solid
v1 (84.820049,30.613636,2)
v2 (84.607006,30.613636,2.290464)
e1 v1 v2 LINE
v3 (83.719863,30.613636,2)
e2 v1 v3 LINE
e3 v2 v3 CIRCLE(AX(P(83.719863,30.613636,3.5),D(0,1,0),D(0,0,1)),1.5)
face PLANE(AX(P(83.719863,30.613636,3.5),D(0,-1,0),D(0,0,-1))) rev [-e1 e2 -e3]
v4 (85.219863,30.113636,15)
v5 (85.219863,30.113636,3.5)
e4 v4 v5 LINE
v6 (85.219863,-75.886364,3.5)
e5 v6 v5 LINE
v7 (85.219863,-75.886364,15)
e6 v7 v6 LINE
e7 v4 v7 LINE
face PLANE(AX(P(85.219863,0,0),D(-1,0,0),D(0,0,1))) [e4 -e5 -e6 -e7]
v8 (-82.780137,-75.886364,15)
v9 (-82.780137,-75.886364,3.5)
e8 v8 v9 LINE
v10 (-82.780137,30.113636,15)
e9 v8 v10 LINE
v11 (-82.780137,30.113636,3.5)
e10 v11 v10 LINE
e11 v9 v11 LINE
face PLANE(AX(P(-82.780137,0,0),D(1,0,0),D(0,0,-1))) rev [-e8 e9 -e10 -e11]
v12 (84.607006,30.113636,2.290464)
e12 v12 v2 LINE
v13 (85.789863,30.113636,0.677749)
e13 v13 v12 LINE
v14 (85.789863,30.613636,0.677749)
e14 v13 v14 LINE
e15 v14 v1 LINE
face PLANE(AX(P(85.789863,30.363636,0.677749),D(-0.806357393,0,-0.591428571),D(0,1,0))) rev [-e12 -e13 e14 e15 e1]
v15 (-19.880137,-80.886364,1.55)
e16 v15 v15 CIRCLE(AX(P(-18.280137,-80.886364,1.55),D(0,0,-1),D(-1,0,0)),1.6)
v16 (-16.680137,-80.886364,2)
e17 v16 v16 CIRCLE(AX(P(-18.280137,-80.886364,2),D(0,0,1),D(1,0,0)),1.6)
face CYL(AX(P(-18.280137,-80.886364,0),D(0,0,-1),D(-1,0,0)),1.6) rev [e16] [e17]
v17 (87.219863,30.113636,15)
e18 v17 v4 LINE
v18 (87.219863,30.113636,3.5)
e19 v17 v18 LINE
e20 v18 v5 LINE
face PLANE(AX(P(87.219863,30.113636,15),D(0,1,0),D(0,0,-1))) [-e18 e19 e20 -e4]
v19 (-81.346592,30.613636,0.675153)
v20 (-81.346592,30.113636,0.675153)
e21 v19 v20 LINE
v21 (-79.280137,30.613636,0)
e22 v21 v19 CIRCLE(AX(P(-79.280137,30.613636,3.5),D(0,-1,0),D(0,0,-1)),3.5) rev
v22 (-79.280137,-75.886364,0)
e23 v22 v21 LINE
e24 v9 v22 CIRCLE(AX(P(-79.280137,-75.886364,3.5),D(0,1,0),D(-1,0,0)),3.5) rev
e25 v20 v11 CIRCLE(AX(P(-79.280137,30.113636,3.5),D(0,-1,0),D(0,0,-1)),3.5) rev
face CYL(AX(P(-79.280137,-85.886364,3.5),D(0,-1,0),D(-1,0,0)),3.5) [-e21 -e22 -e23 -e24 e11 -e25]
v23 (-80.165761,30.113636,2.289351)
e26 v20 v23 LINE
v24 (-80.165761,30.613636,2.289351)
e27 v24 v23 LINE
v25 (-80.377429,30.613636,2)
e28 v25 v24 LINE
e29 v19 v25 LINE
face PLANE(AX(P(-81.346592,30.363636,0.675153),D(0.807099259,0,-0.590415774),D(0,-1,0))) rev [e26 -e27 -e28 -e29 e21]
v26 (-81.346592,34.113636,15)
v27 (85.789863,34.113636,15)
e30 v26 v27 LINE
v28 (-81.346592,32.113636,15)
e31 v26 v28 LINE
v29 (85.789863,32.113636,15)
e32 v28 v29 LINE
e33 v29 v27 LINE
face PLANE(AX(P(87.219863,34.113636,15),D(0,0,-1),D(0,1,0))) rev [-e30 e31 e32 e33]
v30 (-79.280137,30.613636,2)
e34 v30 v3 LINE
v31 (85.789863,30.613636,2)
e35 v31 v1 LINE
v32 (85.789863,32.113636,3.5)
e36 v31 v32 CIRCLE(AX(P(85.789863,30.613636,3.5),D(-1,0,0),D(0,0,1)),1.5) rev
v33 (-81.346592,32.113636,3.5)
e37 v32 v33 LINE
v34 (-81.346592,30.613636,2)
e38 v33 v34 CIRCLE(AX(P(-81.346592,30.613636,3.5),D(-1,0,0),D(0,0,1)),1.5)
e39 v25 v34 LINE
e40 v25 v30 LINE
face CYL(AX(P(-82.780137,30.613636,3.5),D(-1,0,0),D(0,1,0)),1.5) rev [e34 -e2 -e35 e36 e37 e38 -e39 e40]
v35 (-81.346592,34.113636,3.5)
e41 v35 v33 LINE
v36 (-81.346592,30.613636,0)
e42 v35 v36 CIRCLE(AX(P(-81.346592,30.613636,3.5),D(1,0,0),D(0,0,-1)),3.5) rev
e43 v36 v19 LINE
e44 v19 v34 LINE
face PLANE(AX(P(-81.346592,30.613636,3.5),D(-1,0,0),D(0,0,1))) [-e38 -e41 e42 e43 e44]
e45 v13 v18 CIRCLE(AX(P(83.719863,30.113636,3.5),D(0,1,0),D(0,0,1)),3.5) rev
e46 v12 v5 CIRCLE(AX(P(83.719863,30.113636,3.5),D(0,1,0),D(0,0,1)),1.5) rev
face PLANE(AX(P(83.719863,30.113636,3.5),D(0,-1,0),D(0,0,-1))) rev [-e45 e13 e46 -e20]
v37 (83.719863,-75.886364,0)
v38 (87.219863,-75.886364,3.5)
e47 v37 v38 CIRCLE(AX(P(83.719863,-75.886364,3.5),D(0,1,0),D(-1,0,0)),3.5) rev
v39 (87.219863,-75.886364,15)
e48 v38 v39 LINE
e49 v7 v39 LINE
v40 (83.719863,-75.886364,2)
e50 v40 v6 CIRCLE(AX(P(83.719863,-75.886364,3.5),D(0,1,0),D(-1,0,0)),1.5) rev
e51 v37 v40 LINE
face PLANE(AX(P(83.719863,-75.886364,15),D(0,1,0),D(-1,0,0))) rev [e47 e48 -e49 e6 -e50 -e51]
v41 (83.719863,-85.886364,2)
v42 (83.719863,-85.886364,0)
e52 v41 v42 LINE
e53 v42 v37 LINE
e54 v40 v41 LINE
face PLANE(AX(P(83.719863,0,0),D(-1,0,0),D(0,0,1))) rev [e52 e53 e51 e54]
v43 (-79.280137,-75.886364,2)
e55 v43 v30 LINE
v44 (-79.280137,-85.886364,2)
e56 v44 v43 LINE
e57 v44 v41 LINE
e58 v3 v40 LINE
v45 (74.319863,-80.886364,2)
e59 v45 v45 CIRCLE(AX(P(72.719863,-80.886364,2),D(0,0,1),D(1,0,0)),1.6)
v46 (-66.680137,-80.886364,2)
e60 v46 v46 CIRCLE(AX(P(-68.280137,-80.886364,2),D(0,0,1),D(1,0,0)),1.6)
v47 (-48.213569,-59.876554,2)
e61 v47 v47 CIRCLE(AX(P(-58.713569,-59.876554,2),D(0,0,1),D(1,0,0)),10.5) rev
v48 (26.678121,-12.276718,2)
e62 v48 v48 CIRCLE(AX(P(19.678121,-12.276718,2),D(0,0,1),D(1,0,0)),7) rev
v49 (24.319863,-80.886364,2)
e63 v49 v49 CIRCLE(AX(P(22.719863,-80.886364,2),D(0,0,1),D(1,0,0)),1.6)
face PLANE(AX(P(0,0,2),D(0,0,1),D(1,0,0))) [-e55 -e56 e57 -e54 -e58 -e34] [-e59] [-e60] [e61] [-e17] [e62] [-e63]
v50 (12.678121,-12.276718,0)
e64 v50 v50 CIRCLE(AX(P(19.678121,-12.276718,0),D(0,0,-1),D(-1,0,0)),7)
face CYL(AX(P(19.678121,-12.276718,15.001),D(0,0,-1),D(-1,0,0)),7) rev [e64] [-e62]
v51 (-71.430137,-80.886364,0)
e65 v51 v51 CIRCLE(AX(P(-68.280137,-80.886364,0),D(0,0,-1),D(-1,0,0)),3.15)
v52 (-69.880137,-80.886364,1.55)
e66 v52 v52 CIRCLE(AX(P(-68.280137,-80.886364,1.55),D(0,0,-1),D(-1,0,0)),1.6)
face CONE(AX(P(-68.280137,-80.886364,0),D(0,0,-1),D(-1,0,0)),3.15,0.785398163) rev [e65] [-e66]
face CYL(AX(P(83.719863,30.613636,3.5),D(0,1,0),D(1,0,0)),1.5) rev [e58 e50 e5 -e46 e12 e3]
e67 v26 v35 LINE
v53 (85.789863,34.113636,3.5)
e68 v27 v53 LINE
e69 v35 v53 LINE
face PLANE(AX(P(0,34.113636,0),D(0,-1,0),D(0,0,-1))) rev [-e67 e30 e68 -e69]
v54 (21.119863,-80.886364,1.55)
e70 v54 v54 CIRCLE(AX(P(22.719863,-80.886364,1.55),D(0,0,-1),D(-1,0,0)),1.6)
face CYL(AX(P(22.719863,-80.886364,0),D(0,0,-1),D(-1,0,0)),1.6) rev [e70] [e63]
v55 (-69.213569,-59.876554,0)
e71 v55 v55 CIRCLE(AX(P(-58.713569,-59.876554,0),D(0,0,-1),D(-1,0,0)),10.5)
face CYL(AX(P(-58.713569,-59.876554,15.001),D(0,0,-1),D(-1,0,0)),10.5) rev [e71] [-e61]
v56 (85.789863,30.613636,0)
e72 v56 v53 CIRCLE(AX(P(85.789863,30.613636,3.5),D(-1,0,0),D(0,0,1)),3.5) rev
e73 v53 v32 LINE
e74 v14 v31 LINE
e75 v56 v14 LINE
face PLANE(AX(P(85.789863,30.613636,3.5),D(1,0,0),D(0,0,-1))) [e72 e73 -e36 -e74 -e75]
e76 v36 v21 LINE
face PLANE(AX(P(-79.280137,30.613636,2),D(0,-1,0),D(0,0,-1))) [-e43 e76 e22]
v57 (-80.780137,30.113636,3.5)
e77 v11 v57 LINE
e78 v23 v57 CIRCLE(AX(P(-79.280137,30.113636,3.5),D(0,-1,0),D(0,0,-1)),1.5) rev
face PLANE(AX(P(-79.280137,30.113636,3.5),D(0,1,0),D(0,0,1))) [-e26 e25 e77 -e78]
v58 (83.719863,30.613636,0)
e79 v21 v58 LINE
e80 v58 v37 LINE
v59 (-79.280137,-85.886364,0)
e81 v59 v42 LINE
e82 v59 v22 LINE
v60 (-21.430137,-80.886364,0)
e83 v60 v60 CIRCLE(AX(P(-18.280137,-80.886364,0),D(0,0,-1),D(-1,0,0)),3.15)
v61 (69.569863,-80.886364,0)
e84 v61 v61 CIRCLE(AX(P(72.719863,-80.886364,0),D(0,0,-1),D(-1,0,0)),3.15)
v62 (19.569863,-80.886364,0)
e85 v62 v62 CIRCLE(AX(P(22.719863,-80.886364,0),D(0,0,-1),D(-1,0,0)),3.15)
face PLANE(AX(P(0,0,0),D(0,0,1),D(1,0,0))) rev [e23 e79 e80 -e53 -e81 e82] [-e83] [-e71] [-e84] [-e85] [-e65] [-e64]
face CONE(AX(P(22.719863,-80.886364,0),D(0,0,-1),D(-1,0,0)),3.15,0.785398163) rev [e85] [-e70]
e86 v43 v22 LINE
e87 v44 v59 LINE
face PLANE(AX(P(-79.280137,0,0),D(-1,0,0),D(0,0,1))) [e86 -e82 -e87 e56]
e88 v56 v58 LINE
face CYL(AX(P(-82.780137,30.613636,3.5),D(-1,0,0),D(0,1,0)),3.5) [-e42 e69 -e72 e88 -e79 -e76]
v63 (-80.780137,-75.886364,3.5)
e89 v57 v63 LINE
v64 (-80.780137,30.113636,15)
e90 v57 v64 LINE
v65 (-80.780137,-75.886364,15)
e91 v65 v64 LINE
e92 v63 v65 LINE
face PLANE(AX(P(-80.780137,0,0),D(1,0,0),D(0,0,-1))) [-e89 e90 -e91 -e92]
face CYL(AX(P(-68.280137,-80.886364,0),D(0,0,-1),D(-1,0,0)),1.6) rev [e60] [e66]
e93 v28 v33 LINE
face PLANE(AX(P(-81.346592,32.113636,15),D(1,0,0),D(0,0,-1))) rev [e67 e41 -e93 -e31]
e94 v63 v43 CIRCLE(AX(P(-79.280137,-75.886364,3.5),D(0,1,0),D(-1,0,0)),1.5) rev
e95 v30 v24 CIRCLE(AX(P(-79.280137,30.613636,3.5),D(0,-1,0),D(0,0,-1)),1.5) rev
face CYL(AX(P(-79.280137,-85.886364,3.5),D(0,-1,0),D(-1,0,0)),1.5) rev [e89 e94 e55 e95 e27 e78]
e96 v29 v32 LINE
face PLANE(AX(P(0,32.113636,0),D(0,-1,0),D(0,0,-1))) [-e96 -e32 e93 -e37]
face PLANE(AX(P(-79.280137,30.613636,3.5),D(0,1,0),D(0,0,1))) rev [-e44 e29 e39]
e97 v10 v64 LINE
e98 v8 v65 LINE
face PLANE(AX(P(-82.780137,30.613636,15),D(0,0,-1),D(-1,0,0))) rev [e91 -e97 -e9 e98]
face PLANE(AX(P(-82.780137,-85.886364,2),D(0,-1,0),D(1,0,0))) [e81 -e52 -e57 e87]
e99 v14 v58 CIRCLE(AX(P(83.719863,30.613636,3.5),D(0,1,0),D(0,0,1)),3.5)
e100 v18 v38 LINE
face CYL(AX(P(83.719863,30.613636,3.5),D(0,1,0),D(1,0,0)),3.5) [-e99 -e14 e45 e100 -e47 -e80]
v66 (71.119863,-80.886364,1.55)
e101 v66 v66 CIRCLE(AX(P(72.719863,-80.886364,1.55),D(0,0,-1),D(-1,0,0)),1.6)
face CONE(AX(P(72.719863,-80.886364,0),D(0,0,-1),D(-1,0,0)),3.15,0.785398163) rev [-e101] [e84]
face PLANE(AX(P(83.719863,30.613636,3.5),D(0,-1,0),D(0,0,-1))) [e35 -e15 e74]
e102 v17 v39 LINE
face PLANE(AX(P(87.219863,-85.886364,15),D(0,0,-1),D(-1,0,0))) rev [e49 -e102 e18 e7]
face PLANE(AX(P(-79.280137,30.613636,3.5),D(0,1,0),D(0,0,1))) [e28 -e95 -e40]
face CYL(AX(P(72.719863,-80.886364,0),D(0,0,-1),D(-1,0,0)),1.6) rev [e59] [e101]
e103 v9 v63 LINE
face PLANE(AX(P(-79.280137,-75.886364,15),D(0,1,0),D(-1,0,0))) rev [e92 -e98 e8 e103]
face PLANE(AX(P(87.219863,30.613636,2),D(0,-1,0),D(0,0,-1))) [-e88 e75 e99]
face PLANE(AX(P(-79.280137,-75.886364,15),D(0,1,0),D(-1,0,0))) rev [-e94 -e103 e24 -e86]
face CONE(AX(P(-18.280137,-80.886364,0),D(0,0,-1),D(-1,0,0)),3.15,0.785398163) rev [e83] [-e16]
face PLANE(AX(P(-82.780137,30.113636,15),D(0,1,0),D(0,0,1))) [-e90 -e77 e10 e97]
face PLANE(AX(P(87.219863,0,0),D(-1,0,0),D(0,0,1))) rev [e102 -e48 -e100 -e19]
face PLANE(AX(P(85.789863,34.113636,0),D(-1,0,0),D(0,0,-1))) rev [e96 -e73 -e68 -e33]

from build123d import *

# Parameters (mm, degrees)
SKETCH1_W                                       = 170
SKETCH1_H                                       = 118
BOSS_EXTRUDE1_DEPTH                             = 2
EDGE_FLANGE4_STRIP_W                            = 11
EDGE_FLANGE4_STRIP_H                            = 2
EDGE_FLANGE4_STRIP_CUT_DEPTH                    = 170
EDGE_FLANGE4_DEPTH                              = 170
EDGE_FLANGE5_STRIP_W                            = 11
EDGE_FLANGE5_STRIP_H                            = 2
EDGE_FLANGE5_STRIP_CUT_DEPTH                    = 116.5
EDGE_FLANGE5_DEPTH                              = 116.5
EDGE_FLANGE6_STRIP_W                            = 11
EDGE_FLANGE6_STRIP_H                            = 2
EDGE_FLANGE6_STRIP_CUT_DEPTH                    = 116.5
EDGE_FLANGE6_DEPTH                              = 116.5
SKETCH26_W                                      = 18.240462441
SKETCH26_H                                      = 10
CUT_EXTRUDE2_DEPTH                              = 3.5
SKETCH27_W                                      = 23.960032842
SKETCH27_H                                      = 10
CUT_EXTRUDE3_DEPTH                              = 3.5
CSK_FOR_M3_FLAT_HEAD_MACHINE_SCREW2_D           = 3.2
CSK_FOR_M3_FLAT_HEAD_MACHINE_SCREW2_CSINK_D     = 6.3
CSK_FOR_M3_FLAT_HEAD_MACHINE_SCREW2_CSINK_ANGLE = 90
CUT_EXTRUDE4_REACH                              = 125.324
SKETCH32_R                                      = 7
CUT_EXTRUDE5_REACH                              = 125.324
SKETCH33_R                                      = 10.5
CUT_EXTRUDE6_START                              = -4
CUT_EXTRUDE6_OUTLINE_W                          = 1.43
CUT_EXTRUDE6_OUTLINE_H                          = 18
CUT_EXTRUDE6_OUTLINE_W_2                        = 1.43354479
CUT_EXTRUDE6_DEPTH                              = 4
CUT_EXTRUDE6_2_DEPTH                            = 0.5


# Read off the part's stored shape, not the designer's step: Cut-Extrude6
# Sheet-metal steps are written as plain solids
with BuildPart() as part:
    # Sketch1 → Boss-Extrude1 (new body)
    with BuildSketch(Plane.XY):
        with Locations((2.219863014, -26.886363636)):
            Rectangle(SKETCH1_W, SKETCH1_H)
    extrude(amount=BOSS_EXTRUDE1_DEPTH)

    # Edge-Flange4 strip (across the edge) → Edge-Flange4 strip cut (cut)
    with BuildSketch(Plane(origin=(87.219863014, 32.113636364, 2), x_dir=(0, -1, 0), z_dir=(-1, 0, 0))):
        with Locations((-4, -1)):
            Rectangle(EDGE_FLANGE4_STRIP_W, EDGE_FLANGE4_STRIP_H)
    extrude(amount=EDGE_FLANGE4_STRIP_CUT_DEPTH, mode=Mode.SUBTRACT)

    # Edge-Flange4 section (across the edge) → Edge-Flange4 (add)
    with BuildSketch(Plane(origin=(87.219863014, 32.113636364, 2), x_dir=(0, -1, 0), z_dir=(-1, 0, 0))):
        with BuildLine():
            Line((-2, 1.5), (-2, 13))
            Line((-2, 13), (0, 13))
            Line((0, 13), (0, 1.5))
            ThreePointArc((0, 1.5), (0.439339828, 0.439339828), (1.5, 0))
            Line((1.5, 0), (1.5, -2))
            ThreePointArc((1.5, -2), (-0.974873734, -0.974873734), (-2, 1.5))
        make_face()
    extrude(amount=EDGE_FLANGE4_DEPTH)

    # Edge-Flange5 strip (across the edge) → Edge-Flange5 strip cut (cut)
    with BuildSketch(Plane(origin=(-82.780136986, 30.613636364, 2), x_dir=(1, 0, 0), z_dir=(0, -1, 0))):
        with Locations((-2, -1)):
            Rectangle(EDGE_FLANGE5_STRIP_W, EDGE_FLANGE5_STRIP_H)
    extrude(amount=EDGE_FLANGE5_STRIP_CUT_DEPTH, mode=Mode.SUBTRACT)

    # Edge-Flange5 section (across the edge) → Edge-Flange5 (add)
    with BuildSketch(Plane(origin=(-82.780136986, 30.613636364, 2), x_dir=(1, 0, 0), z_dir=(0, -1, 0))):
        with BuildLine():
            Line((0, 1.5), (0, 13))
            Line((0, 13), (2, 13))
            Line((2, 13), (2, 1.5))
            ThreePointArc((2, 1.5), (2.439339828, 0.439339828), (3.5, 0))
            Line((3.5, 0), (3.5, -2))
            ThreePointArc((3.5, -2), (1.025126266, -0.974873734), (0, 1.5))
        make_face()
    extrude(amount=EDGE_FLANGE5_DEPTH)

    # Edge-Flange6 strip (across the edge) → Edge-Flange6 strip cut (cut)
    with BuildSketch(Plane(origin=(87.219863014, -85.886363636, 2), x_dir=(-1, 0, 0), z_dir=(0, 1, 0))):
        with Locations((-2, -1)):
            Rectangle(EDGE_FLANGE6_STRIP_W, EDGE_FLANGE6_STRIP_H)
    extrude(amount=EDGE_FLANGE6_STRIP_CUT_DEPTH, mode=Mode.SUBTRACT)

    # Edge-Flange6 section (across the edge) → Edge-Flange6 (add)
    with BuildSketch(Plane(origin=(87.219863014, -85.886363636, 2), x_dir=(-1, 0, 0), z_dir=(0, 1, 0))):
        with BuildLine():
            Line((0, 1.5), (0, 13))
            Line((0, 13), (2, 13))
            Line((2, 13), (2, 1.5))
            ThreePointArc((2, 1.5), (2.439339828, 0.439339828), (3.5, 0))
            Line((3.5, 0), (3.5, -2))
            ThreePointArc((3.5, -2), (1.025126266, -0.974873734), (0, 1.5))
        make_face()
    extrude(amount=EDGE_FLANGE6_DEPTH)

    # Sketch26 → Cut-Extrude2 (cut)
    with BuildSketch(Plane.ZY.offset(82.780136986)):
        with Locations((5.87976878, -80.886363636)):
            Rectangle(SKETCH26_W, SKETCH26_H)
    extrude(amount=-CUT_EXTRUDE2_DEPTH, mode=Mode.SUBTRACT)

    # Sketch27 → Cut-Extrude3 (cut)
    with BuildSketch(Plane(origin=(87.219863014, 0, 0), x_dir=(0, 0, -1), z_dir=(1, 0, 0))):
        with Locations((-3.019983579, -80.886363636)):
            Rectangle(SKETCH27_W, SKETCH27_H)
    extrude(amount=-CUT_EXTRUDE3_DEPTH, mode=Mode.SUBTRACT)

    # CSK for M3 Flat Head Machine Screw2 (through all)
    with Locations(Plane(origin=(0, 0, 0), x_dir=(-1, 0, 0), z_dir=(0, 0, -1))):
        with Locations((-72.719863014, -80.886363636), (-22.719863014, -80.886363636), (18.280136986, -80.886363636), (68.280136986, -80.886363636)):
            CounterSinkHole(CSK_FOR_M3_FLAT_HEAD_MACHINE_SCREW2_D / 2, CSK_FOR_M3_FLAT_HEAD_MACHINE_SCREW2_CSINK_D / 2, counter_sink_angle=CSK_FOR_M3_FLAT_HEAD_MACHINE_SCREW2_CSINK_ANGLE)

    # Sketch32 → Cut-Extrude4 (cut, up to next)
    with BuildSketch(Plane(origin=(0, 0, 0), x_dir=(-1, 0, 0), z_dir=(0, 0, -1)), mode=Mode.PRIVATE) as cut_extrude4_sk1:
        with Locations((-19.678120583, -12.276718373)):
            Circle(SKETCH32_R)
    cut_extrude4_tool1 = extrude(cut_extrude4_sk1.sketch, amount=-CUT_EXTRUDE4_REACH, mode=Mode.PRIVATE) & part.part
    add(cut_extrude4_tool1.solids().sort_by_distance((19.678121, -12.276718, 0))[0], mode=Mode.SUBTRACT)

    # Sketch33 → Cut-Extrude5 (cut, up to next)
    with BuildSketch(Plane(origin=(0, 0, 0), x_dir=(-1, 0, 0), z_dir=(0, 0, -1)), mode=Mode.PRIVATE) as cut_extrude5_sk1:
        with Locations((58.713568672, -59.876553933)):
            Circle(SKETCH33_R)
    cut_extrude5_tool1 = extrude(cut_extrude5_sk1.sketch, amount=-CUT_EXTRUDE5_REACH, mode=Mode.PRIVATE) & part.part
    add(cut_extrude5_tool1.solids().sort_by_distance((-58.713569, -59.876554, 0))[0], mode=Mode.SUBTRACT)

    # Cut-Extrude6 outline → Cut-Extrude6 (cut)
    with BuildSketch(Plane(origin=(0, 34.113636364, 0), x_dir=(1, 0, 0), z_dir=(0, 1, 0)).offset(CUT_EXTRUDE6_START)):
        with Locations((86.504863014, -8)):
            Rectangle(CUT_EXTRUDE6_OUTLINE_W, CUT_EXTRUDE6_OUTLINE_H)
        with Locations((-82.063364591, -8)):
            Rectangle(CUT_EXTRUDE6_OUTLINE_W_2, CUT_EXTRUDE6_OUTLINE_H)
    extrude(amount=CUT_EXTRUDE6_DEPTH, mode=Mode.SUBTRACT)

    # Cut-Extrude6 2 outline → Cut-Extrude6 2 (cut)
    with BuildSketch(Plane(origin=(0, 34.113636364, 0), x_dir=(1, 0, 0), z_dir=(0, 1, 0)).offset(CUT_EXTRUDE6_START)):
        Polygon((85.789863014, -17), (85.789863014, -0.677749125), (84.607005871, -2.290463911), (73.818191888, -17), align=None)
        Polygon((-81.346592196, -17), (-69.404507856, -17), (-80.165760648, -2.289351112), (-81.346592196, -0.675152595), align=None)
    extrude(amount=CUT_EXTRUDE6_2_DEPTH, mode=Mode.SUBTRACT)


solid = part.part
